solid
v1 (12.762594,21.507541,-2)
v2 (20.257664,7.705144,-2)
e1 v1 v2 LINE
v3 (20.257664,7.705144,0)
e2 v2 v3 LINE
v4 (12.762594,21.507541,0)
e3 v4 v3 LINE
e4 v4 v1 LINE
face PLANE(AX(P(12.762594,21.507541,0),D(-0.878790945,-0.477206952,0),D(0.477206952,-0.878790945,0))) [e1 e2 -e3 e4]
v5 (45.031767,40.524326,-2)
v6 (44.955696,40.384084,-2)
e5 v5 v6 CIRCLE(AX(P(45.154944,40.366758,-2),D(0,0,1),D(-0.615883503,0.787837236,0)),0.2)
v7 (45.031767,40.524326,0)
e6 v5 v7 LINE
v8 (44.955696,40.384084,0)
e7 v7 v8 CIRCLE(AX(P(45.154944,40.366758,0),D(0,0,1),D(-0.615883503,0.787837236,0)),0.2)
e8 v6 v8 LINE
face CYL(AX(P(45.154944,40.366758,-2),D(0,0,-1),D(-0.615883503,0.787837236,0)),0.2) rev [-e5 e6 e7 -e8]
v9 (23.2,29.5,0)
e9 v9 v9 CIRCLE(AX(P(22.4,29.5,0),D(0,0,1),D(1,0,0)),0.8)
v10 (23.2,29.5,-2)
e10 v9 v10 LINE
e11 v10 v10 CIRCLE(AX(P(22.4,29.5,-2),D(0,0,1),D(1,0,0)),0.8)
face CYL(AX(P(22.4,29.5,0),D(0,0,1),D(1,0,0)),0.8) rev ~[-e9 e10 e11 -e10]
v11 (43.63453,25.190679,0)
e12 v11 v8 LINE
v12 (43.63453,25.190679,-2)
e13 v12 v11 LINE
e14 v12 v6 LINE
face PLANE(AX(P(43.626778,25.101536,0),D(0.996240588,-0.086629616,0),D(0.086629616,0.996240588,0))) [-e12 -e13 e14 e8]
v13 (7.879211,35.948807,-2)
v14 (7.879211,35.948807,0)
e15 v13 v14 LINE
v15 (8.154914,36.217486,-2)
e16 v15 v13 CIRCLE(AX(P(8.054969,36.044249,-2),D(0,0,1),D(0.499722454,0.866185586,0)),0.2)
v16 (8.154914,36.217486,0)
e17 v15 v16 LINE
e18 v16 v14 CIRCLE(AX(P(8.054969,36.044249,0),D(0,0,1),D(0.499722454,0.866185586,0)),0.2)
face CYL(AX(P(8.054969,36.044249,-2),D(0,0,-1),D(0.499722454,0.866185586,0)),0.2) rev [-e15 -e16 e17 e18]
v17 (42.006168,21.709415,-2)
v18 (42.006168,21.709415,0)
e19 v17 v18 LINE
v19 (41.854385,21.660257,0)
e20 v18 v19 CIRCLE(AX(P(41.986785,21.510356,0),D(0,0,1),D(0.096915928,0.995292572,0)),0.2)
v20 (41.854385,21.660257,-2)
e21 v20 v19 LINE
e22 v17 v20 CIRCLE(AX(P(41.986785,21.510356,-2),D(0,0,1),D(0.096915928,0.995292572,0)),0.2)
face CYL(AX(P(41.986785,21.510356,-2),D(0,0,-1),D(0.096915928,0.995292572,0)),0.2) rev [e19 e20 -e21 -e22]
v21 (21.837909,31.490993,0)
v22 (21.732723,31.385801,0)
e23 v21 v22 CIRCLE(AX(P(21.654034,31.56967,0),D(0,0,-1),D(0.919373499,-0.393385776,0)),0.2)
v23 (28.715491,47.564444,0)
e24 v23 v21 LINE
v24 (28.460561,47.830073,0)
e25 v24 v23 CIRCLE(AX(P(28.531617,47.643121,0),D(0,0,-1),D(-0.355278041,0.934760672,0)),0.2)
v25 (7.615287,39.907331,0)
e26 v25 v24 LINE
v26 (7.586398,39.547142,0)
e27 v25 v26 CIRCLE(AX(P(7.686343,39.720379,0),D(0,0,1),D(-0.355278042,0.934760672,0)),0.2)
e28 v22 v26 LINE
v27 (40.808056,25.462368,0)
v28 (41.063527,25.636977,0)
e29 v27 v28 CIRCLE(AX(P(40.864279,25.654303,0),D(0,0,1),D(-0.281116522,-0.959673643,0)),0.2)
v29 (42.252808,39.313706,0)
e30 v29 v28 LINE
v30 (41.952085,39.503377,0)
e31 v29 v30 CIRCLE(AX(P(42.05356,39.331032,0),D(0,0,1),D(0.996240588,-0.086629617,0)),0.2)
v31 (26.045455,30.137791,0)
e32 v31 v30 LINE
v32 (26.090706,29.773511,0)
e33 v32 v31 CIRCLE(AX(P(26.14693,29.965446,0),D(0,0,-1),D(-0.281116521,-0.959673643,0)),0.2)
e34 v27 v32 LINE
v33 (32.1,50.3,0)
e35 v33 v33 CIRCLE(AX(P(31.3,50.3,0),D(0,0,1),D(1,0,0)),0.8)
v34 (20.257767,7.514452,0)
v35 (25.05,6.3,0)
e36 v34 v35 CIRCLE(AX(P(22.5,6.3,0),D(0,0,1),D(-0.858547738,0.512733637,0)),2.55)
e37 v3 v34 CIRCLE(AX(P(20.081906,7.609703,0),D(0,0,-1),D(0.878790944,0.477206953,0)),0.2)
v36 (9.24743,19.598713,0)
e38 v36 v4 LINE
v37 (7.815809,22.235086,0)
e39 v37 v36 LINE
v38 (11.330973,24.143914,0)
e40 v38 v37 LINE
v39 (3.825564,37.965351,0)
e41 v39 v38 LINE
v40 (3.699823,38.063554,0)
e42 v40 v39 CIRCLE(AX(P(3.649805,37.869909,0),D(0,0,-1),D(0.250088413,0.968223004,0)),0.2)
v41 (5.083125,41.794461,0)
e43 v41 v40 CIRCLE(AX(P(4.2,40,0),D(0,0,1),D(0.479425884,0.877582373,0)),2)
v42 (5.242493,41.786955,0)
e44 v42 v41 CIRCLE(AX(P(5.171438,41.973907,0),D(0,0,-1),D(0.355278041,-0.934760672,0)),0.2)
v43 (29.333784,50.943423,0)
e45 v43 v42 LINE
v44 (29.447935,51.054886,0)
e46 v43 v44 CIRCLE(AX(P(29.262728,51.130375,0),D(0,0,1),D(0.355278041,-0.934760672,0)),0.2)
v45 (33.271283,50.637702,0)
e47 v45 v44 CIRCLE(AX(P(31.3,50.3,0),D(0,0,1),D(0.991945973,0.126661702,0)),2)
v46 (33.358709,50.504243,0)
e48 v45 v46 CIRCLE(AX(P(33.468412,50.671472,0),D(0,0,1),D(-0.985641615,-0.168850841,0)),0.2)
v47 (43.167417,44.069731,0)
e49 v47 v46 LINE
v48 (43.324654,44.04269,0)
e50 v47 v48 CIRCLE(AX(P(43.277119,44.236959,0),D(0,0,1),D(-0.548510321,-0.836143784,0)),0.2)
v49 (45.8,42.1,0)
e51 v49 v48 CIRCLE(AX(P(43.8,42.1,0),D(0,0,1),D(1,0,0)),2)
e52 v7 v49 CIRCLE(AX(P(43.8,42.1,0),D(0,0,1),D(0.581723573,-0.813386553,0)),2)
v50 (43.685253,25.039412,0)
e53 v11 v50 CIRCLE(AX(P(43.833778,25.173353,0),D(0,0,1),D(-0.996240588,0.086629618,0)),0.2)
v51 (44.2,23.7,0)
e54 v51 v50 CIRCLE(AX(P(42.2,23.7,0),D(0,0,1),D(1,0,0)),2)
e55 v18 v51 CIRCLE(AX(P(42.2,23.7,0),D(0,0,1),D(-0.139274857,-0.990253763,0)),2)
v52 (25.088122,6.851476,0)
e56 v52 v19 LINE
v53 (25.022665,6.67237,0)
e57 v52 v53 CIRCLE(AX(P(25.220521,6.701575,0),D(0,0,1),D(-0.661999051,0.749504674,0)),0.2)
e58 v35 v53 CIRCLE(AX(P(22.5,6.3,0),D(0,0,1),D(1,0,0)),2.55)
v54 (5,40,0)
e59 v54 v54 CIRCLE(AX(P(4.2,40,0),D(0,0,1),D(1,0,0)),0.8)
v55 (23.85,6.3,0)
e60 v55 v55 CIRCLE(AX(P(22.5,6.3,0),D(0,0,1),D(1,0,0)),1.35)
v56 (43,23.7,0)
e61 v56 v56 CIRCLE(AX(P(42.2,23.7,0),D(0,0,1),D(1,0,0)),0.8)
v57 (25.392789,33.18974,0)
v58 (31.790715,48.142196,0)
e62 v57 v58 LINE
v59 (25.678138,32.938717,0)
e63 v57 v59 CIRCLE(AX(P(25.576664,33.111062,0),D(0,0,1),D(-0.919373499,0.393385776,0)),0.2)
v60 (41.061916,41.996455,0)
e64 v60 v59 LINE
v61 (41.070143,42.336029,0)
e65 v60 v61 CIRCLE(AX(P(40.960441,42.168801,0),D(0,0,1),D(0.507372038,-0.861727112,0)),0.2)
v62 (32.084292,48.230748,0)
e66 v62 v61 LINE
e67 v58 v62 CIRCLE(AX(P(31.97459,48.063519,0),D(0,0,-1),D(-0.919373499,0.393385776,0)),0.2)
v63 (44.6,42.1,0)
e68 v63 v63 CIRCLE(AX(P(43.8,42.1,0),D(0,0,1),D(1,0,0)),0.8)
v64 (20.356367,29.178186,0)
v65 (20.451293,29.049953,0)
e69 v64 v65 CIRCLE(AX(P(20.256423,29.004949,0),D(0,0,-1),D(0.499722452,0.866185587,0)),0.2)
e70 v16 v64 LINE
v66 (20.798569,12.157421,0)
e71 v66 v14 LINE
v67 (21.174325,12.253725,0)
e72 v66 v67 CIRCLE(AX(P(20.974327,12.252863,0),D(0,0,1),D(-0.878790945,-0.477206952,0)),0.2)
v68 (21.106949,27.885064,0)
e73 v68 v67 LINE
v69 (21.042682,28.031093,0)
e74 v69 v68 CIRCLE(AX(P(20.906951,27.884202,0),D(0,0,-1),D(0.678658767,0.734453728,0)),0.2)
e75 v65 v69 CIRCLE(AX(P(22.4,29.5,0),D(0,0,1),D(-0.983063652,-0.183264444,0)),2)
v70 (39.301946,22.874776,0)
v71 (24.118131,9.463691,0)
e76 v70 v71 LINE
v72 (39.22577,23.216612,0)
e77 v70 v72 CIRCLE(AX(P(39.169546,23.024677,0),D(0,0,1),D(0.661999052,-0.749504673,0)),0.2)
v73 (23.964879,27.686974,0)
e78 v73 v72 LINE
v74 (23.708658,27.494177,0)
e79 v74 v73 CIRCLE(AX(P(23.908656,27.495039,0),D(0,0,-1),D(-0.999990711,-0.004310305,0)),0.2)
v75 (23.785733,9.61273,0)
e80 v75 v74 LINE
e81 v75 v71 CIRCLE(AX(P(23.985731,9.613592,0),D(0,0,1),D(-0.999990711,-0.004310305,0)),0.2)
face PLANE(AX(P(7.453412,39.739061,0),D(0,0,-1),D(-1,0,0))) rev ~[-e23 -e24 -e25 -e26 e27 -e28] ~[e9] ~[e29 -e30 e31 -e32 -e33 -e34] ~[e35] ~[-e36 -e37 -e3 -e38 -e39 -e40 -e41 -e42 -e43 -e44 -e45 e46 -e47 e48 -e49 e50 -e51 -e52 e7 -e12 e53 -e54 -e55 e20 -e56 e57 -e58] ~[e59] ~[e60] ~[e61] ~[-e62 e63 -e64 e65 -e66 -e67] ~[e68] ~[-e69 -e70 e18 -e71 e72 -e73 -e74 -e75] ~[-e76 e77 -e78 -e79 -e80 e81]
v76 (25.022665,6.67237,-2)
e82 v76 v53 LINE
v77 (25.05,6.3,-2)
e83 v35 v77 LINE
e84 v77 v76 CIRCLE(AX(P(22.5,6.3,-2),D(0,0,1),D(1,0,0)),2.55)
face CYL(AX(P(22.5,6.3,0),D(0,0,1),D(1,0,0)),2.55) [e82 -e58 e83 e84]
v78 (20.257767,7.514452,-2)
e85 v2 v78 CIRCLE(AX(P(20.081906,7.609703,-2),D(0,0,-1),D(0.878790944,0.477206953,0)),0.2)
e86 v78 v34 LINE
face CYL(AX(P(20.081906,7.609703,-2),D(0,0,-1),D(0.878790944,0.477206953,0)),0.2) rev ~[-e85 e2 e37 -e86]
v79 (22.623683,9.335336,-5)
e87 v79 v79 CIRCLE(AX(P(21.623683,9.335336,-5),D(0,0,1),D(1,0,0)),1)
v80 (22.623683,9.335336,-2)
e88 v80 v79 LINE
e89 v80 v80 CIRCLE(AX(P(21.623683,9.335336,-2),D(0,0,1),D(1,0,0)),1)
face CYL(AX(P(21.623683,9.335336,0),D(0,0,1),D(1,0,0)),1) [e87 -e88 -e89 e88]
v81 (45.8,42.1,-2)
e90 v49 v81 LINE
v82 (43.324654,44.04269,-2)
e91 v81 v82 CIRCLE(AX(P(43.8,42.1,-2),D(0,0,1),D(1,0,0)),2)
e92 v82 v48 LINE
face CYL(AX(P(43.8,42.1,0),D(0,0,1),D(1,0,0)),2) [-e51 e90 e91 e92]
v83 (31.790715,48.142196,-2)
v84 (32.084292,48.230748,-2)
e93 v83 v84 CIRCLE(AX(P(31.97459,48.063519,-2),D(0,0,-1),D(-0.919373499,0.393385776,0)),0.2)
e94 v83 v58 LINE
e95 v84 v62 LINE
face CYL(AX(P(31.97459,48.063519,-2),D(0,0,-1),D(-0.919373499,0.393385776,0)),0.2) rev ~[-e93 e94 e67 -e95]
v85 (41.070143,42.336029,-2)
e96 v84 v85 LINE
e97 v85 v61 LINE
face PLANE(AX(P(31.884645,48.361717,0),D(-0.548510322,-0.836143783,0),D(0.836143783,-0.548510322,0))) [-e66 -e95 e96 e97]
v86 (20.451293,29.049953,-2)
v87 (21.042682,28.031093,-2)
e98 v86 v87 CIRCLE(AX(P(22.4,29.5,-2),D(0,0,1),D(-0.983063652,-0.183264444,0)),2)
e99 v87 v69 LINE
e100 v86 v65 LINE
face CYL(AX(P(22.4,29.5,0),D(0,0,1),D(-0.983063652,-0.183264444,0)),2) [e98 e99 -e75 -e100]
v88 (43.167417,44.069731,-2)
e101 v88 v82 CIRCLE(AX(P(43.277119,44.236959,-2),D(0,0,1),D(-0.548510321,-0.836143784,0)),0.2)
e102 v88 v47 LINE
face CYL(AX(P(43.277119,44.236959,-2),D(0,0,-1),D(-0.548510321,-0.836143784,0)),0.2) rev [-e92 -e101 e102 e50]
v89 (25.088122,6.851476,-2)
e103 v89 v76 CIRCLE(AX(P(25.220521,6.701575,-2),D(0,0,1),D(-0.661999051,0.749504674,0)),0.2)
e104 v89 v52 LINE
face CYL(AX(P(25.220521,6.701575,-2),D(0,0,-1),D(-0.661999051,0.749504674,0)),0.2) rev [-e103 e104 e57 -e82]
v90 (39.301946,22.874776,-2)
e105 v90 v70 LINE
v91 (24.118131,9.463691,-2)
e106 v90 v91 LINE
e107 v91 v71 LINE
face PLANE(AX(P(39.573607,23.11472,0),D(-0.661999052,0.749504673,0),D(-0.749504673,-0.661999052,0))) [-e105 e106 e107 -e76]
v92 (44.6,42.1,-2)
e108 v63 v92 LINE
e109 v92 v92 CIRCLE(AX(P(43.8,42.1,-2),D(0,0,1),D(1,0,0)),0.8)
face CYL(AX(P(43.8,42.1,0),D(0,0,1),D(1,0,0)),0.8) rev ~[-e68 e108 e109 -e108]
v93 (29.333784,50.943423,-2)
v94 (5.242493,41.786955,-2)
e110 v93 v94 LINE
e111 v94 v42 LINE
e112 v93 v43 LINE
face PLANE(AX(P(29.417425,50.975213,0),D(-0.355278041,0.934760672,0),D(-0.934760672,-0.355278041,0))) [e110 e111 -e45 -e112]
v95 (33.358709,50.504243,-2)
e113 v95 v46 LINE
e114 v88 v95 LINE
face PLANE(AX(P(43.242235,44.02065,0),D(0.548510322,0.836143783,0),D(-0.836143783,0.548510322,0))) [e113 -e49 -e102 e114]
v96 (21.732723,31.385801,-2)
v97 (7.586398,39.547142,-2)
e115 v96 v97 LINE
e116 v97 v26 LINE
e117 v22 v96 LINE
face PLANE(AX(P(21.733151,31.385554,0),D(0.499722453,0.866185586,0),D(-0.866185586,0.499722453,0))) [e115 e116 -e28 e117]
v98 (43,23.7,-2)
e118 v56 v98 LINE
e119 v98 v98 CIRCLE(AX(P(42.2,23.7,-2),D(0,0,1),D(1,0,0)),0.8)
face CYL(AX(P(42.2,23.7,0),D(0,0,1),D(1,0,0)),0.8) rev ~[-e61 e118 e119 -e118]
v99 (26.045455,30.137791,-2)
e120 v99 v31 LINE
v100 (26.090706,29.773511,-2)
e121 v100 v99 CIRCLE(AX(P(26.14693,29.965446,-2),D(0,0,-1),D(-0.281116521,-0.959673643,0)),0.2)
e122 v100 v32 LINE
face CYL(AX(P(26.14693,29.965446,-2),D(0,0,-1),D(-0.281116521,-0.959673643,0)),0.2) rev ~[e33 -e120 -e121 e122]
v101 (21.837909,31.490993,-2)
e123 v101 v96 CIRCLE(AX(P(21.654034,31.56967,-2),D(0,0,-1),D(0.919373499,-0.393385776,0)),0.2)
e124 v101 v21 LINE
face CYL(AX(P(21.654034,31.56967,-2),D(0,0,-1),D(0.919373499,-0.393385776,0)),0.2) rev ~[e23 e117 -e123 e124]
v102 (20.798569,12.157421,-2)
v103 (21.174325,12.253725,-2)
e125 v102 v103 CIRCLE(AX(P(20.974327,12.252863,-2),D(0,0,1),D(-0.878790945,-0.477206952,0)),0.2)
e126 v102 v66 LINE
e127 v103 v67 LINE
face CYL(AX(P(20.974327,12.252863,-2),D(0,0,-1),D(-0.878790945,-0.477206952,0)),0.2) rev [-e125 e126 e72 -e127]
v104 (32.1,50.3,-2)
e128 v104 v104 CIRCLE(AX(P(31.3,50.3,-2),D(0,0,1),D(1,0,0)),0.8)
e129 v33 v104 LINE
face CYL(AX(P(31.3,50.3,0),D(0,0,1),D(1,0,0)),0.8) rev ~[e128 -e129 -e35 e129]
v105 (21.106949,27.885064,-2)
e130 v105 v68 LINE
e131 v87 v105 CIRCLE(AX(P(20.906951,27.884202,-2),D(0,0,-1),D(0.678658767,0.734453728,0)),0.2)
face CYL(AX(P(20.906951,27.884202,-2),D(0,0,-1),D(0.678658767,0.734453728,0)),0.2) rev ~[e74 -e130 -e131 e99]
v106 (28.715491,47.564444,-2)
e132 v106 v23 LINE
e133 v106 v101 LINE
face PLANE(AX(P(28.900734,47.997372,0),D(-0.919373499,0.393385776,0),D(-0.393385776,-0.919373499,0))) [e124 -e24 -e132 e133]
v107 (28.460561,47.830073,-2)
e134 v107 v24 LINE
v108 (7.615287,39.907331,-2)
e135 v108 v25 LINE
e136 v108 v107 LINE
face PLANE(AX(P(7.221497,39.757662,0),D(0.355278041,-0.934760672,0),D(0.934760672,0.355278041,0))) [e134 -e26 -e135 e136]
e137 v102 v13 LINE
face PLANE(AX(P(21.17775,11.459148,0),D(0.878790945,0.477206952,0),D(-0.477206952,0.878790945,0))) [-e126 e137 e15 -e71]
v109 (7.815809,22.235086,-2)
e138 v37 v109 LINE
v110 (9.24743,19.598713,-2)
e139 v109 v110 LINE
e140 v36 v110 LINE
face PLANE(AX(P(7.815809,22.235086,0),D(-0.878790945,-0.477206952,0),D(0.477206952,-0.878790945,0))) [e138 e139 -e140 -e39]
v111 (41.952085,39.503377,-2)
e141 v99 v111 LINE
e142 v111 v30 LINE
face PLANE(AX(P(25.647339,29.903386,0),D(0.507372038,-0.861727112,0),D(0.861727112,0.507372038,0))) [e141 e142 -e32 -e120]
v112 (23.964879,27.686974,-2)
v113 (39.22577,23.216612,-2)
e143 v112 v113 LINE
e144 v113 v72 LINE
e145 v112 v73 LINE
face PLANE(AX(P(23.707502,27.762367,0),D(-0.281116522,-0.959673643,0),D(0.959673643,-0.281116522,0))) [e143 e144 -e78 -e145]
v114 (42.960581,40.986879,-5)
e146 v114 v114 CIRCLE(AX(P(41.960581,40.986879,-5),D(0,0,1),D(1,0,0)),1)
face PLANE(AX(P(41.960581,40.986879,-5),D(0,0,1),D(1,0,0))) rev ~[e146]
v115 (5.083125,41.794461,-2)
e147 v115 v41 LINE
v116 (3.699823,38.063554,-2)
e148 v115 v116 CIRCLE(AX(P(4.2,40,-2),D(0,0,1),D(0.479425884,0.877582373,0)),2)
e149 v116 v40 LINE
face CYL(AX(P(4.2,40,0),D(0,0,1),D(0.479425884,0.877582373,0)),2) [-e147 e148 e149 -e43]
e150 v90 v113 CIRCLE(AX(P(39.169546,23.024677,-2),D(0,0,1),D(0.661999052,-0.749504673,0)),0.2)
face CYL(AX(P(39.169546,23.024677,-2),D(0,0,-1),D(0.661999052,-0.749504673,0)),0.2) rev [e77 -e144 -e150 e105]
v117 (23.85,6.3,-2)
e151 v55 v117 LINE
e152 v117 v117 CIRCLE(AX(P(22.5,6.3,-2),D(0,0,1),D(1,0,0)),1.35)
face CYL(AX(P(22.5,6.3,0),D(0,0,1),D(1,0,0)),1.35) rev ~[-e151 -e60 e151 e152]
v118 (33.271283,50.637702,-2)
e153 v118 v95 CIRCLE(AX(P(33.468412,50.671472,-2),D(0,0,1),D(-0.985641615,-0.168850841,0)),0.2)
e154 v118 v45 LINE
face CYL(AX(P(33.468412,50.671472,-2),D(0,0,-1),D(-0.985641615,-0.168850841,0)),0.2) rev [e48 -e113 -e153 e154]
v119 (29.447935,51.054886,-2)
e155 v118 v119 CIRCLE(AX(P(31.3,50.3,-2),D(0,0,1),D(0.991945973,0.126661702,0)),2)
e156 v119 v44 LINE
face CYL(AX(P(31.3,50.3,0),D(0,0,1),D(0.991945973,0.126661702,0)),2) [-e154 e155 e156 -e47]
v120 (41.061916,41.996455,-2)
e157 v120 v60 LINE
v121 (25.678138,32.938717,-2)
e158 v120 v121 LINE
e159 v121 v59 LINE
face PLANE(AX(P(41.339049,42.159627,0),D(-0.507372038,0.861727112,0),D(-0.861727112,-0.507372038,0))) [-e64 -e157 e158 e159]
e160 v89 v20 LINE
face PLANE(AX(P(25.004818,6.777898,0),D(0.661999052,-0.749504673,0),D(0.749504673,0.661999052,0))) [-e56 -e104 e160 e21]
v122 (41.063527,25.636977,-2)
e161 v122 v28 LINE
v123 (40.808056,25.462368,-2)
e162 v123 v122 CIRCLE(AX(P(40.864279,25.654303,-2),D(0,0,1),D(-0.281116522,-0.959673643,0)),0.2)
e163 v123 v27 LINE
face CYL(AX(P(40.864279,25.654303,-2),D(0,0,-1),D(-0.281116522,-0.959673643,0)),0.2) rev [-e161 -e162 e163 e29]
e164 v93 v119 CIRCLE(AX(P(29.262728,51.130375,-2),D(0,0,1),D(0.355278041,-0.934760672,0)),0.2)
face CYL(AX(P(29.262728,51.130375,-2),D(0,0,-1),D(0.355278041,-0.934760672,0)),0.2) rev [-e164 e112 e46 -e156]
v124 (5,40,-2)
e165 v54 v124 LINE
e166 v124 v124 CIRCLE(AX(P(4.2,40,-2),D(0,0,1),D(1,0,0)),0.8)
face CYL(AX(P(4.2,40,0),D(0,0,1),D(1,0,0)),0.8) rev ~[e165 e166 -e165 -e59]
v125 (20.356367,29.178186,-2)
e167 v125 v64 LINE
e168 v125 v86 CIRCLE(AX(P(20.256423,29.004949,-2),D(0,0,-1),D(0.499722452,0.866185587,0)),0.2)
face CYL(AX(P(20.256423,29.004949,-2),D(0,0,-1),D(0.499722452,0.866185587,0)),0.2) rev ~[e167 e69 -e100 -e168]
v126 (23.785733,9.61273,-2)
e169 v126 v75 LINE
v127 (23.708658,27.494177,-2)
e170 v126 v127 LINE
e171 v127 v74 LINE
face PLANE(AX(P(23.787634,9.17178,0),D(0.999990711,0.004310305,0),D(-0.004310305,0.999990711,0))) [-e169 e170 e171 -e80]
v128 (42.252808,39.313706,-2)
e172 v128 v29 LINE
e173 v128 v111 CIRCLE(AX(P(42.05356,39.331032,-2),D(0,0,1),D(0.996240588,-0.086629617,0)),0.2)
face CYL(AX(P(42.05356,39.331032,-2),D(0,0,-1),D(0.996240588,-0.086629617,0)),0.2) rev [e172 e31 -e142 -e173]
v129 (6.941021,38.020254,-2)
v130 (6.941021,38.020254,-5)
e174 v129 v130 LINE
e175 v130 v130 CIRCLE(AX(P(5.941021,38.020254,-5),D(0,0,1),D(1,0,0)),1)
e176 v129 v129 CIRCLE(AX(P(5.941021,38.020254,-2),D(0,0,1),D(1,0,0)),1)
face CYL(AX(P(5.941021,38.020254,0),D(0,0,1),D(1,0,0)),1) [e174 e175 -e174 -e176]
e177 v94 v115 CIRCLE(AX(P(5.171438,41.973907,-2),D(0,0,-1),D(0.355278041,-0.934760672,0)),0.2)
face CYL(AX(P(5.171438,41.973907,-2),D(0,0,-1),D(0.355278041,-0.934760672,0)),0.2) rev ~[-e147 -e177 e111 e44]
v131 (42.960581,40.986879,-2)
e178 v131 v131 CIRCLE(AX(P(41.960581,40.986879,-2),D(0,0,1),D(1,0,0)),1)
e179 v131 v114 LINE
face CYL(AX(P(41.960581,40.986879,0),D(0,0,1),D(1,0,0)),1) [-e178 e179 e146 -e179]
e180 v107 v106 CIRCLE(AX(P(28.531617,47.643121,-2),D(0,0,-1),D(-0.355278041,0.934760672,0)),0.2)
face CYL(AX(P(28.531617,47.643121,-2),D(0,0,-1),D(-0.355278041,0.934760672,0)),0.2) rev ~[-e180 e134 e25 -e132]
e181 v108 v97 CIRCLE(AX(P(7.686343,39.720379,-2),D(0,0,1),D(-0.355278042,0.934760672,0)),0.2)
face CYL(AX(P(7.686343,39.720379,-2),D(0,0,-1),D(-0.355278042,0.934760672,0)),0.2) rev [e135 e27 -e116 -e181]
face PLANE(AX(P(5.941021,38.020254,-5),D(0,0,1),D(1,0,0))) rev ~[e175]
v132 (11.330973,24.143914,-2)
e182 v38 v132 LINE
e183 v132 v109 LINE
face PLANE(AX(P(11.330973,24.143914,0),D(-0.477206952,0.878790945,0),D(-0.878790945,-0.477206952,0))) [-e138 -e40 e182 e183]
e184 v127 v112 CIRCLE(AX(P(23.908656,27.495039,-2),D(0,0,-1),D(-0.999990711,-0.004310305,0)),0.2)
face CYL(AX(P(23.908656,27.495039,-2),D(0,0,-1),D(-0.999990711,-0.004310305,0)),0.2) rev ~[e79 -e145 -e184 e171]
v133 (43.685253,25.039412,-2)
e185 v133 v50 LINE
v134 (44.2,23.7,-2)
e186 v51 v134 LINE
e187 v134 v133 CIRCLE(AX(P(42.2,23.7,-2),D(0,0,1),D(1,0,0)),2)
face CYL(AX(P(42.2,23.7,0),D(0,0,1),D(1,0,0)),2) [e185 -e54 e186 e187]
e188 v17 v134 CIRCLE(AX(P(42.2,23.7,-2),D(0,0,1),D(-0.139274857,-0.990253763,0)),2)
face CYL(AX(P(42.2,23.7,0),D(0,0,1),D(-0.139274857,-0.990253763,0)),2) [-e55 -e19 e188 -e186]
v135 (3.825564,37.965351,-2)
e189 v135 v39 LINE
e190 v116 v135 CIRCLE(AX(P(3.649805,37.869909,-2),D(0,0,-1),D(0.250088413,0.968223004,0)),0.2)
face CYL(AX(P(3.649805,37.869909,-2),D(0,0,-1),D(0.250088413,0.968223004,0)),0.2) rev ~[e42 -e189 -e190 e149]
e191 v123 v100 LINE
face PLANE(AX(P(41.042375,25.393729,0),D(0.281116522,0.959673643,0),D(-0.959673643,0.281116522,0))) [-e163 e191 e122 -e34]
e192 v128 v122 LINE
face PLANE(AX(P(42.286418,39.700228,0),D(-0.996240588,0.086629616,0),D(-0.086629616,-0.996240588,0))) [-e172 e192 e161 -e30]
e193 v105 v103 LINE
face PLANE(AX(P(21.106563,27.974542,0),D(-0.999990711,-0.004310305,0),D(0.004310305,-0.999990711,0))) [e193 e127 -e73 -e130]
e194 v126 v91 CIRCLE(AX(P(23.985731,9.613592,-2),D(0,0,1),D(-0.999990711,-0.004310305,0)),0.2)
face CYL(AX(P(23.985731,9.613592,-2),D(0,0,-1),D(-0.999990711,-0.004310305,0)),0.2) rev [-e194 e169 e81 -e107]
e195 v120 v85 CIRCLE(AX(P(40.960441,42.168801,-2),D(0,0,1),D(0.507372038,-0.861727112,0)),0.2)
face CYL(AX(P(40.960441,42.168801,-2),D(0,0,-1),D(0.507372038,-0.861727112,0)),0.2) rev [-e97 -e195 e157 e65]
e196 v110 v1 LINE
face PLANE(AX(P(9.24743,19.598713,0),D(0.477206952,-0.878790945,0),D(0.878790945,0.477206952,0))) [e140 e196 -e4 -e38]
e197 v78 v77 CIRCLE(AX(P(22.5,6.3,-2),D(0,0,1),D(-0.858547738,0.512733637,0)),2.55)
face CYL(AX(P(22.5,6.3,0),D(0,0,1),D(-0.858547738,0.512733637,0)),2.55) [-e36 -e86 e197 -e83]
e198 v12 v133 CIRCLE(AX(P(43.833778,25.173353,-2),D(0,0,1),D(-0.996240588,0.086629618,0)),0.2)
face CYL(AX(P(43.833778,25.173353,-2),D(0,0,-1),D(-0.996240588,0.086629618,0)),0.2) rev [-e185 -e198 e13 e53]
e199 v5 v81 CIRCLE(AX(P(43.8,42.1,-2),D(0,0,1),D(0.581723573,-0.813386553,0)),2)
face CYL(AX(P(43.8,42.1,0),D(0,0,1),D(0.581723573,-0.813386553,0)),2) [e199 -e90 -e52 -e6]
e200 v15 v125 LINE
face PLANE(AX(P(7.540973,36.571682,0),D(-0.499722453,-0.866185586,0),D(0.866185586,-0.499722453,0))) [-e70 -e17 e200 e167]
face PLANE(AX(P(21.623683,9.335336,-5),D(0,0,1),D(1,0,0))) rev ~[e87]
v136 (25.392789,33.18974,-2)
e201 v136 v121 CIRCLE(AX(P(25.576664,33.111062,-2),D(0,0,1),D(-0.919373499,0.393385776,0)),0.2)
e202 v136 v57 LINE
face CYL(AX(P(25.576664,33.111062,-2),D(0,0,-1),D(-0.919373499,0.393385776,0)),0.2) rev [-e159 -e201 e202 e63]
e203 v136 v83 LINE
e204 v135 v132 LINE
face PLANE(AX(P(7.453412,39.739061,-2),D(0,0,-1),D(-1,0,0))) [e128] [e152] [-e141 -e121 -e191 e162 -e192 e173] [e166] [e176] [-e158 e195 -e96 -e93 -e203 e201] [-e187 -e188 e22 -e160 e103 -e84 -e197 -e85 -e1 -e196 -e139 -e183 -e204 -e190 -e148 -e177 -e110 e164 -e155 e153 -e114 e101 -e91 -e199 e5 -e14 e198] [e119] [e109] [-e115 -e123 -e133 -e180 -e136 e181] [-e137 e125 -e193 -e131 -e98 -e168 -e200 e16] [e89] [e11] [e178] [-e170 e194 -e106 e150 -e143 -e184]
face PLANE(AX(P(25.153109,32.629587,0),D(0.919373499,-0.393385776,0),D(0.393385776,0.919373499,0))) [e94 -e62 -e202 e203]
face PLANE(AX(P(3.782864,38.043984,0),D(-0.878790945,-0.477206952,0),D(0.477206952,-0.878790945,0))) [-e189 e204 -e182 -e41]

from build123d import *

# Parameters (mm, degrees)
F1_R        = 0.8
F1_R_2      = 1.35
F2_DEPTH    = 2
F3_R        = 1
F4_DEPTH    = 5
F5_T1_DEPTH = 2


# Not quite as in the source:
# - a fillet or chamfer that OpenCascade refuses, or shapes differently, is made with other operations: its cross-section is extruded or revolved along the edge and cut away or added


with BuildPart() as f2:
    # F1 (on Top) → F2 (new body)
    with BuildSketch(Plane.XY):
        with BuildLine():
            ThreePointArc((5.1588517672, 41.7551647468), (5.8189357702, 41.1743283067), (6.1661273036, 40.3665288884))
            Line((6.1661273036, 40.3665288884), (7.2214972283, 39.7576616241))
            Line((7.2214972283, 39.7576616241), (28.9007343827, 47.9973716865))
            Line((28.9007343827, 47.9973716865), (29.5069198348, 49.4140747655))
            ThreePointArc((29.5069198348, 49.4140747655), (29.3032782438, 50.1855350347), (29.4174253255, 50.9752129996))
            Line((29.4174253255, 50.9752129996), (5.1588517672, 41.7551647468))
        make_face()
        with BuildLine():
            Line((43.2422348913, 44.0206504324), (33.2838919458, 50.5533234047))
            ThreePointArc((33.2838919458, 50.5533234047), (33.2959689241, 50.4269175094), (33.3, 50.3))
            ThreePointArc((33.3, 50.3), (32.9116112847, 49.1156398068), (31.8972909329, 48.3912717476))
            Line((31.8972909329, 48.3912717476), (31.8846447163, 48.361716545))
            Line((31.8846447163, 48.361716545), (41.3390492003, 42.1596272035))
            Line((41.3390492003, 42.1596272035), (41.8307045309, 42.4491065103))
            ThreePointArc((41.8307045309, 42.4491065103), (42.3120664109, 43.4364331761), (43.2422348913, 44.0206504324))
        make_face()
        with BuildLine():
            Line((43.6267783824, 25.1015361028), (44.9634471469, 40.4732268946))
            ThreePointArc((44.9634471469, 40.4732268946), (44.0887539119, 40.1209544779), (43.1498718292, 40.2086160195))
            Line((43.1498718292, 40.2086160195), (42.2864184602, 39.7002275873))
            Line((42.2864184602, 39.7002275873), (41.0423751405, 25.3937294107))
            Line((41.0423751405, 25.3937294107), (41.1068738191, 25.3748358584))
            ThreePointArc((41.1068738191, 25.3748358584), (42.4156481787, 25.6883399767), (43.6267783824, 25.1015361028))
        make_face()
        with BuildLine():
            Line((23.7876337156, 9.1717796898), (23.790532231, 8.4993241145))
            ThreePointArc((23.790532231, 8.4993241145), (24.5837459945, 7.769864834), (25.0048179717, 6.7778984503))
            Line((25.0048179717, 6.7778984503), (41.9214502868, 21.7194924748))
            ThreePointArc((41.9214502868, 21.7194924748), (40.9992832251, 22.1005378321), (40.3759708626, 22.8796843864))
            Line((40.3759708626, 22.8796843864), (39.5736067493, 23.1147203388))
            Line((39.5736067493, 23.1147203388), (23.7876337156, 9.1717796898))
        make_face()
        with BuildLine():
            ThreePointArc((6.0825746745, 39.3247870004), (6.1704249985, 39.6573262113), (6.2, 40))
            ThreePointArc((6.2, 40), (6.1915138221, 40.184045365), (6.1661273036, 40.3665288884))
            ThreePointArc((6.1661273036, 40.3665288884), (5.8189357702, 41.1743283067), (5.1588517672, 41.7551647468))
            ThreePointArc((5.1588517672, 41.7551647468), (2.3247456616, 40.6952849534), (3.782863546, 38.0439843613))
            ThreePointArc((3.782863546, 38.0439843613), (4.3297316575, 38.004212011), (4.8668489245, 38.1144463646))
            ThreePointArc((4.8668489245, 38.1144463646), (5.5958497172, 38.5676580133), (6.0677200026, 39.2847224372))
            ThreePointArc((6.0677200026, 39.2847224372), (6.0752543384, 39.3047150466), (6.0825746745, 39.3247870004))
        make_face()
        with Locations((4.2, 40)):
            Circle(F1_R, mode=Mode.SUBTRACT)
        with BuildLine():
            ThreePointArc((33.2838919458, 50.5533234047), (31.5169424001, 52.2881991839), (29.4174253255, 50.9752129996))
            ThreePointArc((29.4174253255, 50.9752129996), (29.3032782438, 50.1855350347), (29.5069198348, 49.4140747655))
            ThreePointArc((29.5069198348, 49.4140747655), (29.8570250617, 48.9151450158), (30.3411482328, 48.5448352532))
            ThreePointArc((30.3411482328, 48.5448352532), (31.0830575999, 48.3118008161), (31.8577651087, 48.3793495676))
            ThreePointArc((31.8577651087, 48.3793495676), (31.8775587843, 48.3852086666), (31.8972909329, 48.3912717476))
            ThreePointArc((31.8972909329, 48.3912717476), (32.9116112847, 49.1156398068), (33.3, 50.3))
            ThreePointArc((33.3, 50.3), (33.2959689241, 50.4269175094), (33.2838919458, 50.5533234047))
        make_face()
        with Locations((31.3, 50.3)):
            Circle(F1_R, mode=Mode.SUBTRACT)
        with BuildLine():
            ThreePointArc((45.8, 42.1), (45.0009308437, 43.699301444), (43.2422348913, 44.0206504324))
            ThreePointArc((43.2422348913, 44.0206504324), (42.3120664109, 43.4364331761), (41.8307045309, 42.4491065103))
            ThreePointArc((41.8307045309, 42.4491065103), (41.8005868024, 42.1484444539), (41.8161080542, 41.8466765953))
            ThreePointArc((41.8161080542, 41.8466765953), (42.0006206287, 41.2269399345), (42.3732216176, 40.6984638972))
            ThreePointArc((42.3732216176, 40.6984638972), (42.7330543859, 40.4083655665), (43.1498718292, 40.2086160195))
            ThreePointArc((43.1498718292, 40.2086160195), (44.0887539119, 40.1209544779), (44.9634471469, 40.4732268946))
            ThreePointArc((44.9634471469, 40.4732268946), (45.578608205, 41.1853673671), (45.8, 42.1))
        make_face()
        with Locations((43.8, 42.1)):
            Circle(F1_R, mode=Mode.SUBTRACT)
        with BuildLine():
            ThreePointArc((44.2, 23.7), (44.0511559584, 24.4571140057), (43.6267783824, 25.1015361028))
            ThreePointArc((43.6267783824, 25.1015361028), (42.4156481787, 25.6883399767), (41.1068738191, 25.3748358584))
            ThreePointArc((41.1068738191, 25.3748358584), (41.071457443, 25.351178881), (41.0365528531, 25.3267731054))
            ThreePointArc((41.0365528531, 25.3267731054), (40.4141774879, 24.6004654104), (40.2002527524, 23.6682046258))
            ThreePointArc((40.2002527524, 23.6682046258), (40.2478838399, 23.2649798885), (40.3759708626, 22.8796843864))
            ThreePointArc((40.3759708626, 22.8796843864), (40.9992832251, 22.1005378321), (41.9214502868, 21.7194924748))
            ThreePointArc((41.9214502868, 21.7194924748), (43.512040505, 22.1905134273), (44.2, 23.7))
        make_face()
        with Locations((42.2, 23.7)):
            Circle(F1_R, mode=Mode.SUBTRACT)
        with BuildLine():
            ThreePointArc((22.5955597255, 8.8482088491), (21.8669162755, 8.7701629496), (21.1905563835, 8.4881173221))
            ThreePointArc((21.1905563835, 8.4881173221), (20.6960652476, 8.1023094654), (20.3107032689, 7.6074707733))
            ThreePointArc((20.3107032689, 7.6074707733), (21.8218431835, 3.8418292711), (25.05, 6.3))
            ThreePointArc((25.05, 6.3), (25.0386793641, 6.5400147623), (25.0048179717, 6.7778984503))
            ThreePointArc((25.0048179717, 6.7778984503), (24.5837459945, 7.769864834), (23.790532231, 8.4993241145))
            ThreePointArc((23.790532231, 8.4993241145), (23.5432842899, 8.6268128181), (23.2836204373, 8.7266106013))
            ThreePointArc((23.2836204373, 8.7266106013), (22.9437746873, 8.8110882157), (22.5955597255, 8.8482088491))
        make_face()
        with Locations((22.5, 6.3)):
            Circle(F1_R_2, mode=Mode.SUBTRACT)
        with BuildLine():
            Line((7.2214972283, 39.7576616241), (6.0825746745, 39.3247870004))
            ThreePointArc((6.0825746745, 39.3247870004), (6.0752543384, 39.3047150466), (6.0677200026, 39.2847224372))
            Line((6.0677200026, 39.2847224372), (7.5409732288, 36.5716823429))
            Line((7.5409732288, 36.5716823429), (20.4338726964, 29.1334711116))
            ThreePointArc((20.4338726964, 29.1334711116), (20.6676288279, 30.499444907), (21.7331510755, 31.3855536354))
            Line((21.7331510755, 31.3855536354), (7.2214972283, 39.7576616241))
        make_face()
        with BuildLine():
            ThreePointArc((6.1661273036, 40.3665288884), (6.1915138221, 40.184045365), (6.2, 40))
            ThreePointArc((6.2, 40), (6.1704249985, 39.6573262113), (6.0825746745, 39.3247870004))
            Line((6.0825746745, 39.3247870004), (7.2214972283, 39.7576616241))
            Line((7.2214972283, 39.7576616241), (6.1661273036, 40.3665288884))
        make_face()
        with BuildLine():
            Line((7.5409732288, 36.5716823429), (6.0677200026, 39.2847224372))
            ThreePointArc((6.0677200026, 39.2847224372), (5.5958497172, 38.5676580133), (4.8668489245, 38.1144463646))
            Line((4.8668489245, 38.1144463646), (7.5409732288, 36.5716823429))
        make_face()
        with BuildLine():
            ThreePointArc((4.8668489245, 38.1144463646), (4.3297316575, 38.004212011), (3.782863546, 38.0439843613))
            Line((3.782863546, 38.0439843613), (11.3309729791, 24.1439139846))
            Line((11.3309729791, 24.1439139846), (12.7625938358, 21.5075411501))
            Line((12.7625938358, 21.5075411501), (20.3107032689, 7.6074707733))
            ThreePointArc((20.3107032689, 7.6074707733), (20.6960652476, 8.1023094654), (21.1905563835, 8.4881173221))
            Line((21.1905563835, 8.4881173221), (21.1777502182, 11.4591476685))
            Line((21.1777502182, 11.4591476685), (7.5409732288, 36.5716823429))
            Line((7.5409732288, 36.5716823429), (4.8668489245, 38.1144463646))
        make_face()
        with BuildLine():
            Line((22.5955597255, 8.8482088491), (21.1777502182, 11.4591476685))
            Line((21.1777502182, 11.4591476685), (21.1905563835, 8.4881173221))
            ThreePointArc((21.1905563835, 8.4881173221), (21.8669162755, 8.7701629496), (22.5955597255, 8.8482088491))
        make_face()
        with BuildLine():
            Line((23.7876337156, 9.1717796898), (23.2836204373, 8.7266106013))
            ThreePointArc((23.2836204373, 8.7266106013), (23.5432842899, 8.6268128181), (23.790532231, 8.4993241145))
            Line((23.790532231, 8.4993241145), (23.7876337156, 9.1717796898))
        make_face()
        with BuildLine():
            Line((21.1065631723, 27.9745423071), (21.1777502182, 11.4591476685))
            Line((21.1777502182, 11.4591476685), (22.5955597255, 8.8482088491))
            ThreePointArc((22.5955597255, 8.8482088491), (22.9437746873, 8.8110882157), (23.2836204373, 8.7266106013))
            Line((23.2836204373, 8.7266106013), (23.7876337156, 9.1717796898))
            Line((23.7876337156, 9.1717796898), (23.7075018728, 27.7623672218))
            Line((23.7075018728, 27.7623672218), (23.4931261809, 27.8251641416))
            ThreePointArc((23.4931261809, 27.8251641416), (22.2750618238, 27.5039062016), (21.1065631723, 27.9745423071))
        make_face()
        with BuildLine():
            Line((40.2002527524, 23.6682046258), (39.5736067493, 23.1147203388))
            Line((39.5736067493, 23.1147203388), (40.3759708626, 22.8796843864))
            ThreePointArc((40.3759708626, 22.8796843864), (40.2478838399, 23.2649798885), (40.2002527524, 23.6682046258))
        make_face()
        with BuildLine():
            ThreePointArc((41.0365528531, 25.3267731054), (41.071457443, 25.351178881), (41.1068738191, 25.3748358584))
            Line((41.1068738191, 25.3748358584), (41.0423751405, 25.3937294107))
            Line((41.0423751405, 25.3937294107), (41.0365528531, 25.3267731054))
        make_face()
        with BuildLine():
            Line((29.5069198348, 49.4140747655), (28.9007343827, 47.9973716865))
            Line((28.9007343827, 47.9973716865), (30.3411482328, 48.5448352532))
            ThreePointArc((30.3411482328, 48.5448352532), (29.8570250617, 48.9151450158), (29.5069198348, 49.4140747655))
        make_face()
        with BuildLine():
            ThreePointArc((31.8972909329, 48.3912717476), (31.8775587843, 48.3852086666), (31.8577651087, 48.3793495676))
            Line((31.8577651087, 48.3793495676), (31.8846447163, 48.361716545))
            Line((31.8846447163, 48.361716545), (31.8972909329, 48.3912717476))
        make_face()
        with BuildLine():
            ThreePointArc((23.7065390199, 27.9857490995), (23.602516175, 27.9018902263), (23.4931261809, 27.8251641416))
            Line((23.4931261809, 27.8251641416), (23.7075018728, 27.7623672218))
            Line((23.7075018728, 27.7623672218), (23.7065390199, 27.9857490995))
        make_face()
        with BuildLine():
            Line((30.3411482328, 48.5448352532), (28.9007343827, 47.9973716865))
            Line((28.9007343827, 47.9973716865), (21.8027090671, 31.4087282524))
            ThreePointArc((21.8027090671, 31.4087282524), (22.4278055637, 31.4998067033), (23.0501281708, 31.3913839805))
            Line((23.0501281708, 31.3913839805), (25.1531087237, 32.6295874836))
            Line((25.1531087237, 32.6295874836), (31.8846447163, 48.361716545))
            Line((31.8846447163, 48.361716545), (31.8577651087, 48.3793495676))
            ThreePointArc((31.8577651087, 48.3793495676), (31.0830575999, 48.3118008161), (30.3411482328, 48.5448352532))
        make_face()
        with BuildLine():
            Line((25.1531087237, 32.6295874836), (23.0501281708, 31.3913839805))
            ThreePointArc((23.0501281708, 31.3913839805), (23.7210047561, 31.0016479062), (24.1930801652, 30.3859252345))
            Line((24.1930801652, 30.3859252345), (25.1531087237, 32.6295874836))
        make_face()
        with BuildLine():
            ThreePointArc((21.8027090671, 31.4087282524), (21.7678238691, 31.397459707), (21.7331510755, 31.3855536354))
            ThreePointArc((21.7331510755, 31.3855536354), (20.6676288279, 30.499444907), (20.4338726964, 29.1334711116))
            ThreePointArc((20.4338726964, 29.1334711116), (20.6702692189, 28.4959923182), (21.1065631723, 27.9745423071))
            ThreePointArc((21.1065631723, 27.9745423071), (22.2750618238, 27.5039062016), (23.4931261809, 27.8251641416))
            ThreePointArc((23.4931261809, 27.8251641416), (23.602516175, 27.9018902263), (23.7065390199, 27.9857490995))
            ThreePointArc((23.7065390199, 27.9857490995), (24.138437017, 28.5111437224), (24.3692954691, 29.1508934897))
            ThreePointArc((24.3692954691, 29.1508934897), (24.3923090797, 29.3247729161), (24.4, 29.5))
            ThreePointArc((24.4, 29.5), (24.3555124999, 29.9194888111), (24.2240291374, 30.3203156136))
            ThreePointArc((24.2240291374, 30.3203156136), (24.208852145, 30.353260756), (24.1930801652, 30.3859252345))
            ThreePointArc((24.1930801652, 30.3859252345), (23.7210047561, 31.0016479062), (23.0501281708, 31.3913839805))
            ThreePointArc((23.0501281708, 31.3913839805), (22.4278055637, 31.4998067033), (21.8027090671, 31.4087282524))
        make_face()
        with Locations((22.4, 29.5)):
            Circle(F1_R, mode=Mode.SUBTRACT)
        with BuildLine():
            ThreePointArc((24.3692954691, 29.1508934897), (24.138437017, 28.5111437224), (23.7065390199, 27.9857490995))
            Line((23.7065390199, 27.9857490995), (23.7075018728, 27.7623672218))
            Line((23.7075018728, 27.7623672218), (39.5736067493, 23.1147203388))
            Line((39.5736067493, 23.1147203388), (40.2002527524, 23.6682046258))
            ThreePointArc((40.2002527524, 23.6682046258), (40.4141774879, 24.6004654104), (41.0365528531, 25.3267731054))
            Line((41.0365528531, 25.3267731054), (41.0423751405, 25.3937294107))
            Line((41.0423751405, 25.3937294107), (25.6473390591, 29.9033864446))
            Line((25.6473390591, 29.9033864446), (24.3692954691, 29.1508934897))
        make_face()
        with BuildLine():
            Line((25.6473390591, 29.9033864446), (24.2240291374, 30.3203156136))
            ThreePointArc((24.2240291374, 30.3203156136), (24.3555124999, 29.9194888111), (24.4, 29.5))
            ThreePointArc((24.4, 29.5), (24.3923090797, 29.3247729161), (24.3692954691, 29.1508934897))
            Line((24.3692954691, 29.1508934897), (25.6473390591, 29.9033864446))
        make_face()
        with BuildLine():
            Line((25.1531087237, 32.6295874836), (24.1930801652, 30.3859252345))
            ThreePointArc((24.1930801652, 30.3859252345), (24.208852145, 30.353260756), (24.2240291374, 30.3203156136))
            Line((24.2240291374, 30.3203156136), (25.6473390591, 29.9033864446))
            Line((25.6473390591, 29.9033864446), (42.2864184602, 39.7002275873))
            Line((42.2864184602, 39.7002275873), (42.3732216176, 40.6984638972))
            ThreePointArc((42.3732216176, 40.6984638972), (42.0006206287, 41.2269399345), (41.8161080542, 41.8466765953))
            Line((41.8161080542, 41.8466765953), (41.3390492003, 42.1596272035))
            Line((41.3390492003, 42.1596272035), (25.1531087237, 32.6295874836))
        make_face()
        with BuildLine():
            ThreePointArc((41.8161080542, 41.8466765953), (41.8005868024, 42.1484444539), (41.8307045309, 42.4491065103))
            Line((41.8307045309, 42.4491065103), (41.3390492003, 42.1596272035))
            Line((41.3390492003, 42.1596272035), (41.8161080542, 41.8466765953))
        make_face()
        with BuildLine():
            Line((42.2864184602, 39.7002275873), (43.1498718292, 40.2086160195))
            ThreePointArc((43.1498718292, 40.2086160195), (42.7330543859, 40.4083655665), (42.3732216176, 40.6984638972))
            Line((42.3732216176, 40.6984638972), (42.2864184602, 39.7002275873))
        make_face()
        Polygon((12.7625938358, 21.5075411501), (11.3309729791, 24.1439139846), (7.8158091997, 22.2350861756), (9.2474300564, 19.5987133411), align=None)
    extrude(amount=-F2_DEPTH)

    # F3 (on face) → F4 (join)
    with BuildSketch(Plane.XY):
        with Locations((21.6236830238, 9.3353357393)):
            Circle(F3_R)
        with Locations((5.9410208844, 38.0202536185)):
            Circle(F3_R)
        with Locations((41.960581314, 40.9868787588)):
            Circle(F3_R)
    extrude(amount=-F4_DEPTH)

    # F5: fillet of radius 0.2 on 26 edges, made by hand

    # F5_s2 → F5_t1 (join)
    with BuildSketch(Plane.XY.offset(-2)):
        with BuildLine():
            ThreePointArc((7.6152873474, 39.9073309314), (7.4869831486, 39.736368397), (7.586398465, 39.5471416799))
            Line((7.586398465, 39.5471416799), (7.2214972283, 39.7576616241))
            Line((7.2214972283, 39.7576616241), (7.6152873474, 39.9073309314))
        make_face()
        with BuildLine():
            ThreePointArc((8.1549136009, 36.2174859744), (7.9153841385, 36.1874830559), (7.8792109212, 35.9488074668))
            Line((7.8792109212, 35.9488074668), (7.5409732288, 36.5716823429))
            Line((7.5409732288, 36.5716823429), (8.1549136009, 36.2174859744))
        make_face()
        with BuildLine():
            ThreePointArc((20.7985689859, 12.157421304), (21.0239808003, 12.0591244239), (21.174325317, 12.2537247554))
            Line((21.174325317, 12.2537247554), (21.1777502182, 11.4591476685))
            Line((21.1777502182, 11.4591476685), (20.7985689859, 12.157421304))
        make_face()
        with BuildLine():
            ThreePointArc((23.7857330682, 9.6127298888), (23.9039049915, 9.4310968268), (24.1181310207, 9.463691015))
            Line((24.1181310207, 9.463691015), (23.7876337156, 9.1717796898))
            Line((23.7876337156, 9.1717796898), (23.7857330682, 9.6127298888))
        make_face()
        with BuildLine():
            ThreePointArc((20.2576640938, 7.7051440082), (20.2819058756, 7.6098108546), (20.2577672936, 7.5144515183))
            ThreePointArc((20.2577672936, 7.5144515183), (20.2837472088, 7.5612389011), (20.3107032689, 7.6074707733))
            Line((20.3107032689, 7.6074707733), (20.2576640938, 7.7051440082))
        make_face()
        with BuildLine():
            ThreePointArc((25.0881216817, 6.8514763464), (25.0326730948, 6.7702265564), (25.0226653835, 6.6723699273))
            ThreePointArc((25.0226653835, 6.6723699273), (25.0142953862, 6.7252278342), (25.0048179717, 6.7778984503))
            Line((25.0048179717, 6.7778984503), (25.0881216817, 6.8514763464))
        make_face()
        with BuildLine():
            ThreePointArc((21.0426824665, 28.0310925443), (21.090007357, 27.9647639806), (21.1069488553, 27.8850638597))
            Line((21.1069488553, 27.8850638597), (21.1065631723, 27.9745423071))
            ThreePointArc((21.1065631723, 27.9745423071), (21.0743212482, 28.0024767625), (21.0426824665, 28.0310925443))
        make_face()
        with BuildLine():
            ThreePointArc((20.356367035, 29.1781859163), (20.4171704433, 29.1239450721), (20.4512932221, 29.0499534537))
            ThreePointArc((20.4512932221, 29.0499534537), (20.442137576, 29.0916193824), (20.4338726964, 29.1334711116))
            Line((20.4338726964, 29.1334711116), (20.356367035, 29.1781859163))
        make_face()
        with BuildLine():
            ThreePointArc((3.6998231735, 38.0635539919), (3.77290973, 38.0275334575), (3.8255636798, 37.9653507815))
            Line((3.8255636798, 37.9653507815), (3.782863546, 38.0439843613))
            ThreePointArc((3.782863546, 38.0439843613), (3.7412389988, 38.0533263387), (3.6998231735, 38.0635539919))
        make_face()
        with BuildLine():
            ThreePointArc((5.2424934778, 41.7869547697), (5.1620285352, 41.7741283656), (5.0831253359, 41.7944608218))
            ThreePointArc((5.0831253359, 41.7944608218), (5.1211981098, 41.7752166185), (5.1588517672, 41.7551647468))
            Line((5.1588517672, 41.7551647468), (5.2424934778, 41.7869547697))
        make_face()
        with BuildLine():
            ThreePointArc((29.3337836149, 50.9434229768), (29.4024548833, 50.9872793392), (29.4479345515, 51.0548864647))
            ThreePointArc((29.4479345515, 51.0548864647), (29.4322550556, 51.0152124318), (29.4174253255, 50.9752129996))
            Line((29.4174253255, 50.9752129996), (29.3337836149, 50.9434229768))
        make_face()
        with BuildLine():
            ThreePointArc((28.4605609872, 47.8300733111), (28.6759140893, 47.7816066752), (28.7154912953, 47.5644440215))
            Line((28.7154912953, 47.5644440215), (28.9007343827, 47.9973716865))
            Line((28.9007343827, 47.9973716865), (28.4605609872, 47.8300733111))
        make_face()
        with BuildLine():
            ThreePointArc((31.7907153575, 48.1421962456), (31.9168341789, 48.2549982237), (32.0842921217, 48.230747847))
            Line((32.0842921217, 48.230747847), (31.8846447163, 48.361716545))
            Line((31.8846447163, 48.361716545), (31.7907153575, 48.1421962456))
        make_face()
        with BuildLine():
            ThreePointArc((33.2712832298, 50.637701685), (33.3011123586, 50.5618772384), (33.3587094883, 50.5042430968))
            Line((33.3587094883, 50.5042430968), (33.2838919458, 50.5533234047))
            ThreePointArc((33.2838919458, 50.5533234047), (33.2780375605, 50.5955797846), (33.2712832298, 50.637701685))
        make_face()
        with BuildLine():
            ThreePointArc((43.1674173488, 44.0697307403), (43.2432226177, 44.0398529085), (43.324654012, 44.0426904518))
            ThreePointArc((43.324654012, 44.0426904518), (43.2833269166, 44.0321099671), (43.2422348913, 44.0206504324))
            Line((43.2422348913, 44.0206504324), (43.1674173488, 44.0697307403))
        make_face()
        with BuildLine():
            ThreePointArc((45.0317670082, 40.5243255293), (44.9791416551, 40.4621186499), (44.9556955913, 40.3840840055))
            Line((44.9556955913, 40.3840840055), (44.9634471469, 40.4732268946))
            ThreePointArc((44.9634471469, 40.4732268946), (44.9978795765, 40.4984118756), (45.0317670082, 40.5243255293))
        make_face()
        with BuildLine():
            ThreePointArc((42.2528078794, 39.3137059082), (42.1602543232, 39.5001952749), (41.9520853542, 39.5033772539))
            Line((41.9520853542, 39.5033772539), (42.2864184602, 39.7002275873))
            Line((42.2864184602, 39.7002275873), (42.2528078794, 39.3137059082))
        make_face()
        with BuildLine():
            ThreePointArc((41.0619157925, 41.996455197), (41.1603827047, 42.163956174), (41.0701434494, 42.3360293761))
            Line((41.0701434494, 42.3360293761), (41.3390492003, 42.1596272035))
            Line((41.3390492003, 42.1596272035), (41.0619157925, 41.996455197))
        make_face()
        with BuildLine():
            ThreePointArc((43.634529938, 25.190678992), (43.6441546963, 25.1097686239), (43.6852527778, 25.0394118806))
            ThreePointArc((43.6852527778, 25.0394118806), (43.6563468764, 25.0707858242), (43.6267783824, 25.1015361028))
            Line((43.6267783824, 25.1015361028), (43.634529938, 25.190678992))
        make_face()
        with BuildLine():
            ThreePointArc((42.0061681452, 21.7094148569), (41.9251626725, 21.7006263973), (41.8543851494, 21.6602572772))
            Line((41.8543851494, 21.6602572772), (41.9214502868, 21.7194924748))
            ThreePointArc((41.9214502868, 21.7194924748), (41.9637554741, 21.7140018822), (42.0061681452, 21.7094148569))
        make_face()
        with BuildLine():
            ThreePointArc((39.3019460595, 22.8747763793), (39.3647578651, 23.0681793251), (39.2257695535, 23.2166120426))
            Line((39.2257695535, 23.2166120426), (39.5736067493, 23.1147203388))
            Line((39.5736067493, 23.1147203388), (39.3019460595, 22.8747763793))
        make_face()
        with BuildLine():
            ThreePointArc((40.8080557039, 25.4623684376), (40.977133264, 25.4891852781), (41.0635271259, 25.6369772429))
            Line((41.0635271259, 25.6369772429), (41.0423751405, 25.3937294107))
            Line((41.0423751405, 25.3937294107), (40.8080557039, 25.4623684376))
        make_face()
        with BuildLine():
            ThreePointArc((21.8379089426, 31.4909931299), (21.7912680279, 31.4241818381), (21.7218493116, 31.381518441))
            ThreePointArc((21.7218493116, 31.381518441), (21.7621340848, 31.3955545559), (21.8027090671, 31.4087282524))
            Line((21.8027090671, 31.4087282524), (21.8379089426, 31.4909931299))
        make_face()
        with BuildLine():
            ThreePointArc((25.3927892122, 33.1897396363), (25.4445634364, 32.9608976905), (25.6781383196, 32.9387170587))
            Line((25.6781383196, 32.9387170587), (25.1531087237, 32.6295874836))
            Line((25.1531087237, 32.6295874836), (25.3927892122, 33.1897396363))
        make_face()
        with BuildLine():
            ThreePointArc((26.0907063793, 29.773511169), (25.9484551281, 29.9407912669), (26.0454552761, 30.13779132))
            Line((26.0454552761, 30.13779132), (25.6473390591, 29.9033864446))
            Line((25.6473390591, 29.9033864446), (26.0907063793, 29.773511169))
        make_face()
        with BuildLine():
            ThreePointArc((23.708657865, 27.4941770411), (23.7884043896, 27.6548500794), (23.9648793114, 27.6869738307))
            Line((23.9648793114, 27.6869738307), (23.7075018728, 27.7623672218))
            Line((23.7075018728, 27.7623672218), (23.708657865, 27.4941770411))
        make_face()
    extrude(amount=F5_T1_DEPTH)


solid = f2.part
